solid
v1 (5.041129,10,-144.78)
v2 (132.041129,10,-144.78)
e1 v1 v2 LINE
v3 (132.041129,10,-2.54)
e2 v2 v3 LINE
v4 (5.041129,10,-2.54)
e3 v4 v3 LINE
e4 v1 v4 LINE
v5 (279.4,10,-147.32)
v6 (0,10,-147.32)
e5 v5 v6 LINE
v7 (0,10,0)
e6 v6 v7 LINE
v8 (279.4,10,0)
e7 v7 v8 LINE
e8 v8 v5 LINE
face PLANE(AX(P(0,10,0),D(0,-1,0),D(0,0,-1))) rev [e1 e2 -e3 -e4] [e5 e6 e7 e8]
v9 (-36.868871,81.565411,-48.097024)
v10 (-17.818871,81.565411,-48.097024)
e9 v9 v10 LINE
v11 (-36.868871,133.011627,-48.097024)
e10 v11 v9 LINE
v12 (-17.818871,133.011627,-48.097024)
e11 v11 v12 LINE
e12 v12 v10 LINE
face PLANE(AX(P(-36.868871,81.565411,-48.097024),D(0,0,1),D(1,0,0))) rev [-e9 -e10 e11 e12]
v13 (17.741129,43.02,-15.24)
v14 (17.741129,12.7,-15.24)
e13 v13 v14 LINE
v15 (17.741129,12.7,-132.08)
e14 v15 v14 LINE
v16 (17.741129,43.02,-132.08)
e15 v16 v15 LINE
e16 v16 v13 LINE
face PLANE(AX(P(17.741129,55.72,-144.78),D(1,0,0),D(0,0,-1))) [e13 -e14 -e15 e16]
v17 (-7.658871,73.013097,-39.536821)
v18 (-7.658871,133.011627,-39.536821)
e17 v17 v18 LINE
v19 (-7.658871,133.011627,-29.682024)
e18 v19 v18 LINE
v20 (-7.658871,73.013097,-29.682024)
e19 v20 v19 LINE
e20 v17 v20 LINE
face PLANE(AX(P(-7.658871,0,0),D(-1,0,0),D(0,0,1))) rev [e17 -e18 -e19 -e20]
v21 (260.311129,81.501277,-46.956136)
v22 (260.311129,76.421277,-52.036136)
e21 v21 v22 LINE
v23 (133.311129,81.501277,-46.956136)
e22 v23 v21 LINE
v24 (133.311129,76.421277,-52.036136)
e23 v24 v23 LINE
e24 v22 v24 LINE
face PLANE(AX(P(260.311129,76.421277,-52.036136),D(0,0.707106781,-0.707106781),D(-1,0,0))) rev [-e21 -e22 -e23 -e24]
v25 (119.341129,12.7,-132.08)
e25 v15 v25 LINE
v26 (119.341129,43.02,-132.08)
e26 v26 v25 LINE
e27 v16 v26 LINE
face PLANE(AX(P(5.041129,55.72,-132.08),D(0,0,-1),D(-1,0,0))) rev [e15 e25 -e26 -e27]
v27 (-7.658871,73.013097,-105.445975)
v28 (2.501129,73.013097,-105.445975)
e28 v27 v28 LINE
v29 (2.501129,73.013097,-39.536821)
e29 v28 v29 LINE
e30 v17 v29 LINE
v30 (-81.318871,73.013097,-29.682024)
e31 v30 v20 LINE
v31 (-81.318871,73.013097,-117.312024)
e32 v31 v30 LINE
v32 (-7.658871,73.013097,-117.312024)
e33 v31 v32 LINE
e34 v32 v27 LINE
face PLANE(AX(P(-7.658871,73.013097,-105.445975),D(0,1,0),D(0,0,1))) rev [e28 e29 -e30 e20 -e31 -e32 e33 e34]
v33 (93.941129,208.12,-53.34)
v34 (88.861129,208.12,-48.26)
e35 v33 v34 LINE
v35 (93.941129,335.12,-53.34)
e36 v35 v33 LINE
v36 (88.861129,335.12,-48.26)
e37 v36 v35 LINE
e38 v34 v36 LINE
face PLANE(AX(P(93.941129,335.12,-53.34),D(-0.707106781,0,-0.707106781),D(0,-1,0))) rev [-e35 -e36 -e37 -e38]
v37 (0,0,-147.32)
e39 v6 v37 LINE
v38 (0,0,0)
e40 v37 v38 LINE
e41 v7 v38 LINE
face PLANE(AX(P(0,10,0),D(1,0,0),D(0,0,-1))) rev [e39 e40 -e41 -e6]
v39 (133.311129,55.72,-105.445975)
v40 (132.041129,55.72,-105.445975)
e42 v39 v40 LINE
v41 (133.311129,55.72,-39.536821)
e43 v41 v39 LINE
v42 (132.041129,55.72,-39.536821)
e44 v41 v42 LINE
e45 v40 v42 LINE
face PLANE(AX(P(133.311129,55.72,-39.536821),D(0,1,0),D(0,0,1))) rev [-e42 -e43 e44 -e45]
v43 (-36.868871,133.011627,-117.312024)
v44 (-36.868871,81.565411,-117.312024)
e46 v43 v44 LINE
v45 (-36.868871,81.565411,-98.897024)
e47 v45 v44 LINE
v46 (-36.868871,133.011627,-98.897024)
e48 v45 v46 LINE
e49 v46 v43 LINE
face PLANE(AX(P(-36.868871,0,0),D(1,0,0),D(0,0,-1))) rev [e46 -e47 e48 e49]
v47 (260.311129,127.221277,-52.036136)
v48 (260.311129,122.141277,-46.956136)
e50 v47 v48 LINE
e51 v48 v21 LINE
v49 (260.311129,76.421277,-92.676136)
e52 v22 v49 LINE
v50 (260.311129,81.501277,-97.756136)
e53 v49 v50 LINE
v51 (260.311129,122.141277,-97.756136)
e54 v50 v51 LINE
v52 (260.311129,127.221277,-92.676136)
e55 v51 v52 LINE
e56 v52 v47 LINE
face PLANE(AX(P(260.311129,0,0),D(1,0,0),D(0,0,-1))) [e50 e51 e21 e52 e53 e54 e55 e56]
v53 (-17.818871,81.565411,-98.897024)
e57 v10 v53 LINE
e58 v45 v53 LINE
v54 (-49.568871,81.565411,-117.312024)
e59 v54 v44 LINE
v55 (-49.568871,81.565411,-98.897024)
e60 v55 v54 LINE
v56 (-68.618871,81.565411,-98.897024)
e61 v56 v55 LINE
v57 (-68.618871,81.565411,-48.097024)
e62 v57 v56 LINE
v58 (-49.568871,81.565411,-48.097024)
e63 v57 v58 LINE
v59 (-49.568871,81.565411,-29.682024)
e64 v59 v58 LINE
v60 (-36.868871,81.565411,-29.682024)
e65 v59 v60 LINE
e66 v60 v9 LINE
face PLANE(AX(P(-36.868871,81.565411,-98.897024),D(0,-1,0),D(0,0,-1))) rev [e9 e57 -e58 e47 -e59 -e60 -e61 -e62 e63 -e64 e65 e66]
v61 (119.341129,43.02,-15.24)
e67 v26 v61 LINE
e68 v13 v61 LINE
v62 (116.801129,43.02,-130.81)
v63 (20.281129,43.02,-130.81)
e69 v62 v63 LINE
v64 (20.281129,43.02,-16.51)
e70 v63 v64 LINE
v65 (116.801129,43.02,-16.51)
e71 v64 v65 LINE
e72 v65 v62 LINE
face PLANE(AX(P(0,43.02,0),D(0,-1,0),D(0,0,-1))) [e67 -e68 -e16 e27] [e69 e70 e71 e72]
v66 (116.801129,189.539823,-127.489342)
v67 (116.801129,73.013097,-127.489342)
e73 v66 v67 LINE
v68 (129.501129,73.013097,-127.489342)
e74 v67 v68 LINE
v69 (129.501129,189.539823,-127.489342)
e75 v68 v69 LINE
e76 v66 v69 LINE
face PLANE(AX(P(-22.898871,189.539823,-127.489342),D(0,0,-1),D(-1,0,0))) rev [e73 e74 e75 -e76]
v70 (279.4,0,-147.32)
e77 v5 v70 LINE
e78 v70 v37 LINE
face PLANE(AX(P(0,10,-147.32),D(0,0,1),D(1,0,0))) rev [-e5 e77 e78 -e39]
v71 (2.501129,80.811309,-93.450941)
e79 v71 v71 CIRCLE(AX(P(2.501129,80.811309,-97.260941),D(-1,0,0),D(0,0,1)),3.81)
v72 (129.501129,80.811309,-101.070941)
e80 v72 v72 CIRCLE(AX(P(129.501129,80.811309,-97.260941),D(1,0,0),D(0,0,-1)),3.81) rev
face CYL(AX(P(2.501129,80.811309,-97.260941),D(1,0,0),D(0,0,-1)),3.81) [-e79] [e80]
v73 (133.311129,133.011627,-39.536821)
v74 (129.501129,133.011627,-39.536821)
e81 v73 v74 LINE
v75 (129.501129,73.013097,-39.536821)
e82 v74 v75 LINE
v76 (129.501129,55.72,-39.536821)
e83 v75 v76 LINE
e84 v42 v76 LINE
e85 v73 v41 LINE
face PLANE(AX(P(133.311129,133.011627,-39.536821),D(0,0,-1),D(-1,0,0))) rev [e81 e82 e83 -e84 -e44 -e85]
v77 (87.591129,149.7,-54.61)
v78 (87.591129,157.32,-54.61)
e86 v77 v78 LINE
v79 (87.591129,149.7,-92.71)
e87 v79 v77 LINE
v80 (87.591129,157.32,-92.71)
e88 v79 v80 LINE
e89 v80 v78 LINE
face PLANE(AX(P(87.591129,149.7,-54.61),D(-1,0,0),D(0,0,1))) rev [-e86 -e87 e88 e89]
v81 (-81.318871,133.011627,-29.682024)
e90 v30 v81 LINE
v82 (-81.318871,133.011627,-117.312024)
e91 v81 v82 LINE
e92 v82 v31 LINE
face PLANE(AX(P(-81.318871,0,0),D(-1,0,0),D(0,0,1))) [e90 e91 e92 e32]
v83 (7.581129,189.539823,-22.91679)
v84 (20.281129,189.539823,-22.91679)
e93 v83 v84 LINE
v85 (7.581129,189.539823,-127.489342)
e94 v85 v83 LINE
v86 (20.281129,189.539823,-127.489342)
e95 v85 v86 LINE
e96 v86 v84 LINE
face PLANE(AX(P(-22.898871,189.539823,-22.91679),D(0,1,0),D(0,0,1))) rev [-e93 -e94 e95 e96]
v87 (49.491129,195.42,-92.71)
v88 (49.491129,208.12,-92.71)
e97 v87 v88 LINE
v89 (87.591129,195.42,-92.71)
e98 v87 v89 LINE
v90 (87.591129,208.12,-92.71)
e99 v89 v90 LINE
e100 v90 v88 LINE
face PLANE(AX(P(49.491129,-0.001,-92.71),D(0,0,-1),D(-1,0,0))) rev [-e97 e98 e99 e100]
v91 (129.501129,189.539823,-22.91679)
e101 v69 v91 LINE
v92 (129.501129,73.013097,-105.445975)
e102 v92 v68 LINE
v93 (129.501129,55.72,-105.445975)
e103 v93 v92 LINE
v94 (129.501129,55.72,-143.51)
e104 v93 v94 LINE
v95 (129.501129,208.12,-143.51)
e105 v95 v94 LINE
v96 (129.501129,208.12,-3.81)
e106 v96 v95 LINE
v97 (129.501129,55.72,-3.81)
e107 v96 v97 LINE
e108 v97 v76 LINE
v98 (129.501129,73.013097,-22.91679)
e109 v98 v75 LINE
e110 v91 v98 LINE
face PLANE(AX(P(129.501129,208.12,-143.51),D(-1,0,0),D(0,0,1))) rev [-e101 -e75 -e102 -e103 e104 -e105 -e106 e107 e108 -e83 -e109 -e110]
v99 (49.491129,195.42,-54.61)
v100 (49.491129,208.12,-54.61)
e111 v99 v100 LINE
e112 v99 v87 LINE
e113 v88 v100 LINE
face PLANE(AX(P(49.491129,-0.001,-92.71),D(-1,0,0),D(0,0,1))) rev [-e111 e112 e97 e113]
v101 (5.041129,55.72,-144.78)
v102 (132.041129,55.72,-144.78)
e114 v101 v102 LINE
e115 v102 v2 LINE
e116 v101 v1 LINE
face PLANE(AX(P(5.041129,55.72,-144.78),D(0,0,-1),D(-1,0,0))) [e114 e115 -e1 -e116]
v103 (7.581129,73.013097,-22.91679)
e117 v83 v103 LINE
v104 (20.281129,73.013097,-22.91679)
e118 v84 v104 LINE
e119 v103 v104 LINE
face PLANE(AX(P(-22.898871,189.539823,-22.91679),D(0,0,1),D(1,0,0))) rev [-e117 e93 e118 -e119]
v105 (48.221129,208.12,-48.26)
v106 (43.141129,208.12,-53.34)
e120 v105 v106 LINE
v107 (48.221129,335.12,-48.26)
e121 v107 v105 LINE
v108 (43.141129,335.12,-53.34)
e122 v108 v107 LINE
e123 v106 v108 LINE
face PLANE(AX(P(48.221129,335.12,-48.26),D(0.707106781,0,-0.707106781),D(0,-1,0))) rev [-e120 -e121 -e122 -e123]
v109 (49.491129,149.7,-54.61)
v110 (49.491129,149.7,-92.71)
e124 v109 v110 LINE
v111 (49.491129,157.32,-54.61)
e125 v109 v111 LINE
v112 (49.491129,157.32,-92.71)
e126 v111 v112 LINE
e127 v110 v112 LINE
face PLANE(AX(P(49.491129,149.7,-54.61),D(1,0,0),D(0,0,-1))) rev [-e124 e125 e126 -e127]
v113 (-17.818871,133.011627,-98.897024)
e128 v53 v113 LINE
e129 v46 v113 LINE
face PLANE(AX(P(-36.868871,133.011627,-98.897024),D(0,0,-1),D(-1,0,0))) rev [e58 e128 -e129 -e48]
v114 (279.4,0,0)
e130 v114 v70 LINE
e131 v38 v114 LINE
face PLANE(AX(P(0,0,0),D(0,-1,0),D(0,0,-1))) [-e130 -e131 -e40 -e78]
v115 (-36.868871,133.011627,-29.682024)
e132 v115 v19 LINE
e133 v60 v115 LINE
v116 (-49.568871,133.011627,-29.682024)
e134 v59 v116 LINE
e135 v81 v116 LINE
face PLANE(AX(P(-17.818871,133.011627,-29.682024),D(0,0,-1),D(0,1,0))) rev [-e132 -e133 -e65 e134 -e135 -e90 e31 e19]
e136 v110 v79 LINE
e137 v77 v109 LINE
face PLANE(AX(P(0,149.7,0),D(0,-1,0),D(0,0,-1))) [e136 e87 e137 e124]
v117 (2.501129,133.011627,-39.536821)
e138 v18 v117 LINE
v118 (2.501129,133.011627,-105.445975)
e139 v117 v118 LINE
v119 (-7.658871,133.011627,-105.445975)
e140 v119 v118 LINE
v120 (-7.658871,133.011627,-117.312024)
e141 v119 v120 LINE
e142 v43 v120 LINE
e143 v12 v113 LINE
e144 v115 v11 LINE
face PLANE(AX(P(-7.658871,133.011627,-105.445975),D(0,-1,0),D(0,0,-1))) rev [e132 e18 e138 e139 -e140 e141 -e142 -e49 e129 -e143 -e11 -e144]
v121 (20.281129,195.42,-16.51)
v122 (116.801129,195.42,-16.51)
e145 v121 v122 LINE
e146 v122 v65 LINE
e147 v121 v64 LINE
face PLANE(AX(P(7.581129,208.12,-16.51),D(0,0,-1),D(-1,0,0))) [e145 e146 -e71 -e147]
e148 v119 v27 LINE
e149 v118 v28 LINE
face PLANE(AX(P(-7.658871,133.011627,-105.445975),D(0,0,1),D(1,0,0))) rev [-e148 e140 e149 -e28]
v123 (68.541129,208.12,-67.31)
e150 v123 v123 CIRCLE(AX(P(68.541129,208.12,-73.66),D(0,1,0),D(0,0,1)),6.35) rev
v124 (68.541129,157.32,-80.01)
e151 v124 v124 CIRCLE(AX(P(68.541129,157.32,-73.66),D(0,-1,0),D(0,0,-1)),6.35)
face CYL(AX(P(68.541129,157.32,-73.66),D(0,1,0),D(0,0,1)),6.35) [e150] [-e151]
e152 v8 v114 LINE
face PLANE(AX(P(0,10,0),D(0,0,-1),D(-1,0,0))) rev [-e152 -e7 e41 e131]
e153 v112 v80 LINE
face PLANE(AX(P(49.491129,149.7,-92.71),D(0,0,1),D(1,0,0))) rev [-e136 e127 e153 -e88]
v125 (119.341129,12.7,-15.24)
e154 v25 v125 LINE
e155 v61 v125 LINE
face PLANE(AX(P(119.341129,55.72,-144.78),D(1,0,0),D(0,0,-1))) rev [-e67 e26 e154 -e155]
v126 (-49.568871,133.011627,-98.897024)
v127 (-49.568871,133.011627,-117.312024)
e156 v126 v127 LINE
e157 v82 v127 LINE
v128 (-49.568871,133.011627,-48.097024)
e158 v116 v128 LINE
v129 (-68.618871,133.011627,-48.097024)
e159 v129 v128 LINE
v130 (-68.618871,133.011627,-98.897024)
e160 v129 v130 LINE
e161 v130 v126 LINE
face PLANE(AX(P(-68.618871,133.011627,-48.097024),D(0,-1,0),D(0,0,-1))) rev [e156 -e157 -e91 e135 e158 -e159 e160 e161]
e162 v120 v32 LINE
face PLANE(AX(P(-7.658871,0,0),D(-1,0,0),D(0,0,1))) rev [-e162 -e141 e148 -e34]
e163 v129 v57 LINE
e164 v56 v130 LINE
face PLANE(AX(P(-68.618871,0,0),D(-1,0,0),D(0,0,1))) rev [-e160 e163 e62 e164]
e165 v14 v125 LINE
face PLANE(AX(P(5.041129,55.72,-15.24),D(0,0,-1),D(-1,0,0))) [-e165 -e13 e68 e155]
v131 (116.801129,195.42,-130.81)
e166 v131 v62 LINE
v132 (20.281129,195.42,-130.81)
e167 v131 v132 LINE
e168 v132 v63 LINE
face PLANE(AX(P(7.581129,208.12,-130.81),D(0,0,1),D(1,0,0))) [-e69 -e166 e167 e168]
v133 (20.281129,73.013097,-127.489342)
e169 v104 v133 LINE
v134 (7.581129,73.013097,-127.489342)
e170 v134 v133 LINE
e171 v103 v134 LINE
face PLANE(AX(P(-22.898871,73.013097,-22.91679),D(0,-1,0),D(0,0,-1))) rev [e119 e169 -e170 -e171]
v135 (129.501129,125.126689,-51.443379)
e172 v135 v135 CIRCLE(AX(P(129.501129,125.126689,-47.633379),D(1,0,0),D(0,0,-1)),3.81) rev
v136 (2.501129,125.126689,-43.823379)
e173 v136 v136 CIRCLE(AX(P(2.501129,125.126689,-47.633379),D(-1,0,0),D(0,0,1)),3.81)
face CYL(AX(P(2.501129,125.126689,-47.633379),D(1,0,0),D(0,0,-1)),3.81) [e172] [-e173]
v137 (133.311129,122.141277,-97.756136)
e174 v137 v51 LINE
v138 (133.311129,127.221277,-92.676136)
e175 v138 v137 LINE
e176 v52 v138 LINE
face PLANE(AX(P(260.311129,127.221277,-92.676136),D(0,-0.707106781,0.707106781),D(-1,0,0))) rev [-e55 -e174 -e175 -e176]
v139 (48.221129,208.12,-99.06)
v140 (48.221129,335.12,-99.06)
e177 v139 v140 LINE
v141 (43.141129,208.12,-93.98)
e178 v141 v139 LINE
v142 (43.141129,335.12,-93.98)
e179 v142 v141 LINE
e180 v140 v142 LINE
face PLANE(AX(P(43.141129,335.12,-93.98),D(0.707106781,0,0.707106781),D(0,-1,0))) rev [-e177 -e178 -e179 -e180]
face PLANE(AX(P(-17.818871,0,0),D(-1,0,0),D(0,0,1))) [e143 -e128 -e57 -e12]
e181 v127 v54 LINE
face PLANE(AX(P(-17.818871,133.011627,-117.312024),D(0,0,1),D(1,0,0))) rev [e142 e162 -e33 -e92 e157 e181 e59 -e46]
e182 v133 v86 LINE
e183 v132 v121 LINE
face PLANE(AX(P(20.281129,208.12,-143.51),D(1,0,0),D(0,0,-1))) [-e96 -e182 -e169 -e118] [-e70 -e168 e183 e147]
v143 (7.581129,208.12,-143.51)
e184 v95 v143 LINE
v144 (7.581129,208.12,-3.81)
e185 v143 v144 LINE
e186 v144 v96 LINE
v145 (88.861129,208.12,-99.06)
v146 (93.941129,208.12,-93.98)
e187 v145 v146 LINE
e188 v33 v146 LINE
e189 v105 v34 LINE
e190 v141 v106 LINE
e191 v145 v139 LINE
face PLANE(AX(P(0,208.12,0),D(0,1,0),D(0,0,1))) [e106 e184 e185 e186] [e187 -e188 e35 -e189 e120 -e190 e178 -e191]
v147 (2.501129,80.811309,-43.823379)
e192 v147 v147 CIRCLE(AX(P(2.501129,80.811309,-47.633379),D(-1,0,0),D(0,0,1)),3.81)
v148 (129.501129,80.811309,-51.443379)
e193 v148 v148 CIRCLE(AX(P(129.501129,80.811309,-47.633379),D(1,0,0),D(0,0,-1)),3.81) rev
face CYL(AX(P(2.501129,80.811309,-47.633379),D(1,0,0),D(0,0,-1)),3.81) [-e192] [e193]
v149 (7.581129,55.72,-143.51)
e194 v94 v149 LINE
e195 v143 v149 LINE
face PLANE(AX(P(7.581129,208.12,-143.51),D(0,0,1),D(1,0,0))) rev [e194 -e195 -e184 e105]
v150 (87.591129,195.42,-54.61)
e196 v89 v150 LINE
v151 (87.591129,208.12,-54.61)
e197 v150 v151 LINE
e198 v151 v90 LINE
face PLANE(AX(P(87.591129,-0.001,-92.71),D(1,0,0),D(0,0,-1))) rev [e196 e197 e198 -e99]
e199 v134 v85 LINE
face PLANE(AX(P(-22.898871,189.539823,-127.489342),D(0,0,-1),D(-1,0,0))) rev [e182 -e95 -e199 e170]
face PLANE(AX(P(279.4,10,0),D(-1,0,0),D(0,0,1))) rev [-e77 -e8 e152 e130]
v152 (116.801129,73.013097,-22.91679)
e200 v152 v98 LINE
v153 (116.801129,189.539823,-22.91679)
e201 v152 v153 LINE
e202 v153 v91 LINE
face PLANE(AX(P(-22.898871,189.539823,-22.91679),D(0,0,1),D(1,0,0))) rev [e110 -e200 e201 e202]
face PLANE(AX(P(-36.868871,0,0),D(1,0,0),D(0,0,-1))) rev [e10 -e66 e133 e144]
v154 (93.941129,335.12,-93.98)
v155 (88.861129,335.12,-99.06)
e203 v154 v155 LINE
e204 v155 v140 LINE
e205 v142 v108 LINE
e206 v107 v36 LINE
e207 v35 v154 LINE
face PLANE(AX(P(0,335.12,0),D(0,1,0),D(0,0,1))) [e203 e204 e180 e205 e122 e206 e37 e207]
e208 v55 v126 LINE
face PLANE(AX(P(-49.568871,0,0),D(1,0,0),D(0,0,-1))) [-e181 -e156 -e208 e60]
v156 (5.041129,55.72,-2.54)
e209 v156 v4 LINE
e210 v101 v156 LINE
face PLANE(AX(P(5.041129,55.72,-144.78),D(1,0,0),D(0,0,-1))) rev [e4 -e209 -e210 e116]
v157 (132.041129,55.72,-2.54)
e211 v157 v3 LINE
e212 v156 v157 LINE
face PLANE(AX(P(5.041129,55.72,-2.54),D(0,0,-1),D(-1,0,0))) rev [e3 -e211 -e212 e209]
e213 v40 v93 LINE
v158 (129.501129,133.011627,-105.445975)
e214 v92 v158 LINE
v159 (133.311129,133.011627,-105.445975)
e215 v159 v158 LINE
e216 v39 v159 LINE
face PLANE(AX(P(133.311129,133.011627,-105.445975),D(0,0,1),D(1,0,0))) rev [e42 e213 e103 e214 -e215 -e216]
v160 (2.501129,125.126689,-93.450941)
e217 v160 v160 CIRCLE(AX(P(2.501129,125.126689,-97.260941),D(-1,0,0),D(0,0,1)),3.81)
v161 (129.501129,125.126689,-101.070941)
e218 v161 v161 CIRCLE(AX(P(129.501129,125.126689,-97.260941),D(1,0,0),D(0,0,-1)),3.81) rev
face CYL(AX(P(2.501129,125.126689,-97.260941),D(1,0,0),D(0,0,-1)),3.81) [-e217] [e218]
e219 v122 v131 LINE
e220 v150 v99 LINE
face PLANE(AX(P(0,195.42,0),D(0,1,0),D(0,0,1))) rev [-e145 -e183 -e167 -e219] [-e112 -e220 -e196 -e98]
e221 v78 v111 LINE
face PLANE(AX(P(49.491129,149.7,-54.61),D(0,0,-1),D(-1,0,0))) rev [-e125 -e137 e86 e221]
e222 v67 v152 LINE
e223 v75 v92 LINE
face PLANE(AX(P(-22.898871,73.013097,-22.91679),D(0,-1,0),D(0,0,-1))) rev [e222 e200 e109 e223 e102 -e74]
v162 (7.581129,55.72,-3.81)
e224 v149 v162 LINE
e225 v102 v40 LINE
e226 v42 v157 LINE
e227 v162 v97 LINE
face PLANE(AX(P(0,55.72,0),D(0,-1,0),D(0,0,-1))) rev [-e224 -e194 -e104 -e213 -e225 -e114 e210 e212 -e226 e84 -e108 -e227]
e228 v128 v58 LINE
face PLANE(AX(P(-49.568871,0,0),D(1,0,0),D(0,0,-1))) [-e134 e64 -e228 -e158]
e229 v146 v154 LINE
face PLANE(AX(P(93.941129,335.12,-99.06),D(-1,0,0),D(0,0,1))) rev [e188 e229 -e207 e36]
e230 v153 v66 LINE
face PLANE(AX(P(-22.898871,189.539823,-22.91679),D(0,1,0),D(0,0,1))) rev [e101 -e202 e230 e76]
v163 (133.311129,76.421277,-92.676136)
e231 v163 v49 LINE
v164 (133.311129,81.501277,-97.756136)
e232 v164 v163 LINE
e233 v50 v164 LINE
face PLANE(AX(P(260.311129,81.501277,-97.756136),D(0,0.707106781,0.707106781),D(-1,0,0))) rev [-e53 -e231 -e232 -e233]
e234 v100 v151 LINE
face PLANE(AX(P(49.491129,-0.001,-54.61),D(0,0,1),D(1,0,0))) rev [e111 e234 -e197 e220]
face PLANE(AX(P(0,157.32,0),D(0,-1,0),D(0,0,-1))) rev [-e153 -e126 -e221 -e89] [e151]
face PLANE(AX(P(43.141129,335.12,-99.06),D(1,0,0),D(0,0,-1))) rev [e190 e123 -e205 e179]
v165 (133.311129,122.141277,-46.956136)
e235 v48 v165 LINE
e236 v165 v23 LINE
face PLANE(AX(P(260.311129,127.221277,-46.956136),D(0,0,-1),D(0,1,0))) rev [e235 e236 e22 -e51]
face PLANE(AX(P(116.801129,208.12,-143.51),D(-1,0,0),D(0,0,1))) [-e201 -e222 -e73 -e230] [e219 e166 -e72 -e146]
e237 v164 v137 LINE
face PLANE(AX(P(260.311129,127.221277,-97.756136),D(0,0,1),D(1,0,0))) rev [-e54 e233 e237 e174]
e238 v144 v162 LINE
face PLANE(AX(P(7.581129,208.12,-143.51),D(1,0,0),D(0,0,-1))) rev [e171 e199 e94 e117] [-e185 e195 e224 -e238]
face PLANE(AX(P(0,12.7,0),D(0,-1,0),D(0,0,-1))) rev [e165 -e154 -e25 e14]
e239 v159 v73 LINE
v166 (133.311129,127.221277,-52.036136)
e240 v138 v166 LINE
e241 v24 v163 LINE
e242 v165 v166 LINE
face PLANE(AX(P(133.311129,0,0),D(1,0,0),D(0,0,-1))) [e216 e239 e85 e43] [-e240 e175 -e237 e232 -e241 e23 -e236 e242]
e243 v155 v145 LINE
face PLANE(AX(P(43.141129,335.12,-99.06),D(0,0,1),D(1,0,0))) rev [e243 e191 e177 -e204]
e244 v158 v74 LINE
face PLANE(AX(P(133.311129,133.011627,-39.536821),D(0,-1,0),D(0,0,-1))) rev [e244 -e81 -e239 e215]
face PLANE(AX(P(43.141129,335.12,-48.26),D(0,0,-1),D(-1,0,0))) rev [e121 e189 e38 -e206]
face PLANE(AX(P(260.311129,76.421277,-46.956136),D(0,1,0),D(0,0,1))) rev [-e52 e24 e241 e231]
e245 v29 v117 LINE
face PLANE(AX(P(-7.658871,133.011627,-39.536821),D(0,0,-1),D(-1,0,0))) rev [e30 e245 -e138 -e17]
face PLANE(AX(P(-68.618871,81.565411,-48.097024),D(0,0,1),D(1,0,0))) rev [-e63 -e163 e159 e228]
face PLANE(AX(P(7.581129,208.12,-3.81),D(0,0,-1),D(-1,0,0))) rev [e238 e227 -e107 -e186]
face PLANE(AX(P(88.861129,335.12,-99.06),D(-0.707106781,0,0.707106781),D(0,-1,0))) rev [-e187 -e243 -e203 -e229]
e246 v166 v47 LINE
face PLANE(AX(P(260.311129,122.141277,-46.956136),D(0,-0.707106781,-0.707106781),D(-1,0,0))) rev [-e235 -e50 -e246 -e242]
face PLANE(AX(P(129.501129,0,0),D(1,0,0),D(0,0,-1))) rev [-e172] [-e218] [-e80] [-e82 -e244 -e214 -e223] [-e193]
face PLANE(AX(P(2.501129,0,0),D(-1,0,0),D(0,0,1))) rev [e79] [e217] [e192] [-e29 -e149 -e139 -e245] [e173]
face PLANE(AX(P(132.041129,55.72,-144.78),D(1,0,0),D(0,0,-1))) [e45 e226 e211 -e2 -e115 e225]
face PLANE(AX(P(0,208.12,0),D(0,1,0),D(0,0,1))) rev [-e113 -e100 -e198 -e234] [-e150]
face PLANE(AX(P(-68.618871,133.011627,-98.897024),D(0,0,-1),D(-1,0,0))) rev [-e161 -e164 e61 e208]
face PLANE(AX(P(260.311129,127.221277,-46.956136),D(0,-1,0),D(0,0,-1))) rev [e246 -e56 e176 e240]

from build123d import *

# Parameters (mm, degrees)
SKETCH1_W            = 279.4
SKETCH1_H            = 147.32
BOSS_EXTRUDE1_DEPTH  = 10
SKETCH2_W            = 127
SKETCH2_H            = 142.24
BOSS_EXTRUDE2_DEPTH  = 45.72
SKETCH3_W            = 121.92
SKETCH3_H            = 139.7
BOSS_EXTRUDE3_DEPTH  = 152.4
SHELL1_START         = -130.81
SHELL1_DEPTH         = 114.3
SHELL1_START_2       = -132.08
SHELL1_2_OUTLINE_W   = 101.6
SHELL1_2_OUTLINE_H   = 30.32
SHELL1_2_DEPTH       = 116.84
SKETCH5_W            = 104.57255138
SKETCH5_H            = 116.526725643
CUT_EXTRUDE1_DEPTH   = 152.4
CUT_EXTRUDE2_REACH   = 380.261
SKETCH6_W            = 38.1
SKETCH6_H            = 38.1
SKETCH7_W            = 50.8
SKETCH7_H            = 50.8
BOSS_EXTRUDE4_DEPTH  = 127
SKETCH8_R            = 6.35
BOSS_EXTRUDE5_DEPTH  = 50.8
SKETCH9_W            = 38.1
SKETCH9_H            = 38.1
BOSS_EXTRUDE6_DEPTH  = 7.62
CHAMFER1_SIZE        = 5.08
SKETCH11_W           = 65.909153677
SKETCH11_H           = 77.291627037
BOSS_EXTRUDE8_DEPTH  = 3.81
SKETCH12_W           = 50.8
SKETCH12_H           = 50.8
BOSS_EXTRUDE9_DEPTH  = 127
CHAMFER2_SIZE        = 5.08
SKETCH13_R           = 3.81
BOSS_EXTRUDE10_DEPTH = 127
SKETCH14_W           = 65.909153677
SKETCH14_H           = 59.998529599
BOSS_EXTRUDE11_DEPTH = 10.16
SKETCH15_W           = 87.63
SKETCH15_H           = 59.998529599
BOSS_EXTRUDE12_DEPTH = 10.16
BOSS_EXTRUDE13_DEPTH = 19.05
SKETCH17_W           = 87.63
SKETCH17_H           = 8.552313921
BOSS_EXTRUDE14_DEPTH = 12.7
BOSS_EXTRUDE15_DEPTH = 19.05
SKETCH19_W           = 87.63
SKETCH19_H           = 59.998529599
BOSS_EXTRUDE16_DEPTH = 12.7


# Read off the part's stored shape, not the designer's step: Shell1
with BuildPart() as part:
    # Sketch1 → Boss-Extrude1 (new body)
    with BuildSketch(Plane(origin=(0, 0, 0), x_dir=(1, 0, 0), z_dir=(0, 1, 0))):
        with Locations((139.7, 73.66)):
            Rectangle(SKETCH1_W, SKETCH1_H)
    extrude(amount=BOSS_EXTRUDE1_DEPTH)

    # Sketch2 → Boss-Extrude2 (add)
    with BuildSketch(Plane(origin=(0, 10, 0), x_dir=(1, 0, 0), z_dir=(0, 1, 0))):
        with Locations((68.541128652, 73.66)):
            Rectangle(SKETCH2_W, SKETCH2_H)
    extrude(amount=BOSS_EXTRUDE2_DEPTH)

    # Sketch3 → Boss-Extrude3 (add)
    with BuildSketch(Plane(origin=(0, 55.72, 0), x_dir=(1, 0, 0), z_dir=(0, 1, 0))):
        with Locations((68.541128652, 73.66)):
            Rectangle(SKETCH3_W, SKETCH3_H)
    extrude(amount=BOSS_EXTRUDE3_DEPTH)

    # Shell1 outline → Shell1 (cut)
    with BuildSketch(Plane.XY.offset(SHELL1_START)):
        Polygon((17.741128652, 12.7), (119.341128652, 12.7), (119.341128652, 43.02), (116.801128652, 43.02), (116.801128652, 195.42), (20.281128652, 195.42), (20.281128652, 43.02), (17.741128652, 43.02), align=None)
    extrude(amount=SHELL1_DEPTH, mode=Mode.SUBTRACT)

    # Shell1 2 outline → Shell1 2 (cut)
    with BuildSketch(Plane.XY.offset(SHELL1_START_2)):
        with Locations((68.541128652, 27.86)):
            Rectangle(SHELL1_2_OUTLINE_W, SHELL1_2_OUTLINE_H)
    extrude(amount=SHELL1_2_DEPTH, mode=Mode.SUBTRACT)

    # Sketch5 → Cut-Extrude1 (cut)
    with BuildSketch(Plane(origin=(129.501128652, 0, 0), x_dir=(0, 0, -1), z_dir=(1, 0, 0))):
        with Locations((75.203066098, 131.276460259)):
            Rectangle(SKETCH5_W, SKETCH5_H)
    extrude(amount=-CUT_EXTRUDE1_DEPTH, mode=Mode.SUBTRACT)

    # Sketch6 → Cut-Extrude2 (cut, up to next)
    with BuildSketch(Plane(origin=(0, 208.12, 0), x_dir=(1, 0, 0), z_dir=(0, 1, 0)), mode=Mode.PRIVATE) as cut_extrude2_sk1:
        with Locations((68.541128652, 73.66)):
            Rectangle(SKETCH6_W, SKETCH6_H)
    cut_extrude2_tool1 = extrude(cut_extrude2_sk1.sketch, amount=-CUT_EXTRUDE2_REACH, mode=Mode.PRIVATE) & part.part
    add(cut_extrude2_tool1.solids().sort_by_distance((68.541129, 208.12, -73.66))[0], mode=Mode.SUBTRACT)

    # Sketch7 → Boss-Extrude4 (add)
    with BuildSketch(Plane(origin=(0, 208.12, 0), x_dir=(1, 0, 0), z_dir=(0, 1, 0))):
        with Locations((68.541128652, 73.66)):
            Rectangle(SKETCH7_W, SKETCH7_H)
    extrude(amount=BOSS_EXTRUDE4_DEPTH)

    # Sketch8 → Boss-Extrude5 (add)
    with BuildSketch(Plane.XZ.offset(-208.12)):
        with Locations(Location((68.541128652, -73.66, 0), (0, 0, 90))):
            Circle(SKETCH8_R)
    extrude(amount=BOSS_EXTRUDE5_DEPTH)

    # Sketch9 → Boss-Extrude6 (add)
    with BuildSketch(Plane.XZ.offset(-157.32)):
        with Locations((68.541128652, -73.66)):
            Rectangle(SKETCH9_W, SKETCH9_H)
    extrude(amount=BOSS_EXTRUDE6_DEPTH)

    # Chamfer1
    chamfer1_edges = [part.edges().sort_by_distance(p)[0] for p in [
        (43.141128652, 271.62, -99.06),
        (43.141128652, 271.62, -48.26),
        (93.941128652, 271.62, -48.26),
        (93.941128652, 271.62, -99.06),
    ]]
    chamfer(chamfer1_edges, length=CHAMFER1_SIZE)

    # Sketch11 → Boss-Extrude8 (add)
    with BuildSketch(Plane(origin=(129.501128652, 0, 0), x_dir=(0, 0, -1), z_dir=(1, 0, 0))):
        with Locations((72.491397984, 94.365813519)):
            Rectangle(SKETCH11_W, SKETCH11_H)
    extrude(amount=BOSS_EXTRUDE8_DEPTH)

    # Sketch12 → Boss-Extrude9 (add)
    with BuildSketch(Plane(origin=(133.311128652, 0, 0), x_dir=(0, 0, -1), z_dir=(1, 0, 0))):
        with Locations((72.356136011, 101.821276894)):
            Rectangle(SKETCH12_W, SKETCH12_H)
    extrude(amount=BOSS_EXTRUDE9_DEPTH)

    # Chamfer2
    chamfer2_edges = [part.edges().sort_by_distance(p)[0] for p in [
        (196.811128652, 127.221276894, -46.956136011),
        (196.811128652, 76.421276894, -46.956136011),
        (196.811128652, 76.421276894, -97.756136011),
        (196.811128652, 127.221276894, -97.756136011),
    ]]
    chamfer(chamfer2_edges, length=CHAMFER2_SIZE)

    # Sketch13 → Boss-Extrude10 (add)
    with BuildSketch(Plane.ZY.offset(-129.501128652)):
        with Locations(Location((-97.260941216, 125.126689221, 0), (0, 0, 180))):
            Circle(SKETCH13_R)
        with Locations(Location((-47.633379276, 125.126689221, 0), (0, 0, 180))):
            Circle(SKETCH13_R)
        with Locations(Location((-97.260941216, 80.811309035, 0), (0, 0, 180))):
            Circle(SKETCH13_R)
        with Locations(Location((-47.633379276, 80.811309035, 0), (0, 0, 180))):
            Circle(SKETCH13_R)
    extrude(amount=BOSS_EXTRUDE10_DEPTH)

    # Sketch14 → Boss-Extrude11 (add)
    with BuildSketch(Plane.ZY.offset(-2.501128652)):
        with Locations((-72.491397984, 103.012362238)):
            Rectangle(SKETCH14_W, SKETCH14_H)
    extrude(amount=BOSS_EXTRUDE11_DEPTH)

    # Sketch15 → Boss-Extrude12 (add)
    with BuildSketch(Plane.ZY.offset(7.658871348)):
        with Locations((-73.497023893, 103.012362238)):
            Rectangle(SKETCH15_W, SKETCH15_H)
    extrude(amount=BOSS_EXTRUDE12_DEPTH)

    # Sketch16 → Boss-Extrude13 (add)
    with BuildSketch(Plane.ZY.offset(17.818871348)):
        Polygon((-117.312023893, 133.011627037), (-98.897023893, 133.011627037), (-98.897023893, 81.565411359), (-48.097023893, 81.565411359), (-48.097023893, 133.011627037), (-29.682023893, 133.011627037), (-29.682023893, 73.013097438), (-117.312023893, 73.013097438), align=None)
    extrude(amount=BOSS_EXTRUDE13_DEPTH)

    # Sketch17 → Boss-Extrude14 (add)
    with BuildSketch(Plane.ZY.offset(36.868871348)):
        with Locations((-73.497023893, 77.289254399)):
            Rectangle(SKETCH17_W, SKETCH17_H)
    extrude(amount=BOSS_EXTRUDE14_DEPTH)

    # Sketch18 → Boss-Extrude15 (add)
    with BuildSketch(Plane.ZY.offset(49.568871348)):
        Polygon((-117.312023893, 73.013097438), (-117.312023893, 133.011627037), (-98.897023893, 133.011627037), (-98.897023893, 81.565411359), (-48.097023893, 81.565411359), (-48.097023893, 133.011627037), (-29.682023893, 133.011627037), (-29.682023893, 73.013097438), align=None)
    extrude(amount=BOSS_EXTRUDE15_DEPTH)

    # Sketch19 → Boss-Extrude16 (add)
    with BuildSketch(Plane.ZY.offset(68.618871348)):
        with Locations((-73.497023893, 103.012362238)):
            Rectangle(SKETCH19_W, SKETCH19_H)
    extrude(amount=BOSS_EXTRUDE16_DEPTH)


solid = part.part
